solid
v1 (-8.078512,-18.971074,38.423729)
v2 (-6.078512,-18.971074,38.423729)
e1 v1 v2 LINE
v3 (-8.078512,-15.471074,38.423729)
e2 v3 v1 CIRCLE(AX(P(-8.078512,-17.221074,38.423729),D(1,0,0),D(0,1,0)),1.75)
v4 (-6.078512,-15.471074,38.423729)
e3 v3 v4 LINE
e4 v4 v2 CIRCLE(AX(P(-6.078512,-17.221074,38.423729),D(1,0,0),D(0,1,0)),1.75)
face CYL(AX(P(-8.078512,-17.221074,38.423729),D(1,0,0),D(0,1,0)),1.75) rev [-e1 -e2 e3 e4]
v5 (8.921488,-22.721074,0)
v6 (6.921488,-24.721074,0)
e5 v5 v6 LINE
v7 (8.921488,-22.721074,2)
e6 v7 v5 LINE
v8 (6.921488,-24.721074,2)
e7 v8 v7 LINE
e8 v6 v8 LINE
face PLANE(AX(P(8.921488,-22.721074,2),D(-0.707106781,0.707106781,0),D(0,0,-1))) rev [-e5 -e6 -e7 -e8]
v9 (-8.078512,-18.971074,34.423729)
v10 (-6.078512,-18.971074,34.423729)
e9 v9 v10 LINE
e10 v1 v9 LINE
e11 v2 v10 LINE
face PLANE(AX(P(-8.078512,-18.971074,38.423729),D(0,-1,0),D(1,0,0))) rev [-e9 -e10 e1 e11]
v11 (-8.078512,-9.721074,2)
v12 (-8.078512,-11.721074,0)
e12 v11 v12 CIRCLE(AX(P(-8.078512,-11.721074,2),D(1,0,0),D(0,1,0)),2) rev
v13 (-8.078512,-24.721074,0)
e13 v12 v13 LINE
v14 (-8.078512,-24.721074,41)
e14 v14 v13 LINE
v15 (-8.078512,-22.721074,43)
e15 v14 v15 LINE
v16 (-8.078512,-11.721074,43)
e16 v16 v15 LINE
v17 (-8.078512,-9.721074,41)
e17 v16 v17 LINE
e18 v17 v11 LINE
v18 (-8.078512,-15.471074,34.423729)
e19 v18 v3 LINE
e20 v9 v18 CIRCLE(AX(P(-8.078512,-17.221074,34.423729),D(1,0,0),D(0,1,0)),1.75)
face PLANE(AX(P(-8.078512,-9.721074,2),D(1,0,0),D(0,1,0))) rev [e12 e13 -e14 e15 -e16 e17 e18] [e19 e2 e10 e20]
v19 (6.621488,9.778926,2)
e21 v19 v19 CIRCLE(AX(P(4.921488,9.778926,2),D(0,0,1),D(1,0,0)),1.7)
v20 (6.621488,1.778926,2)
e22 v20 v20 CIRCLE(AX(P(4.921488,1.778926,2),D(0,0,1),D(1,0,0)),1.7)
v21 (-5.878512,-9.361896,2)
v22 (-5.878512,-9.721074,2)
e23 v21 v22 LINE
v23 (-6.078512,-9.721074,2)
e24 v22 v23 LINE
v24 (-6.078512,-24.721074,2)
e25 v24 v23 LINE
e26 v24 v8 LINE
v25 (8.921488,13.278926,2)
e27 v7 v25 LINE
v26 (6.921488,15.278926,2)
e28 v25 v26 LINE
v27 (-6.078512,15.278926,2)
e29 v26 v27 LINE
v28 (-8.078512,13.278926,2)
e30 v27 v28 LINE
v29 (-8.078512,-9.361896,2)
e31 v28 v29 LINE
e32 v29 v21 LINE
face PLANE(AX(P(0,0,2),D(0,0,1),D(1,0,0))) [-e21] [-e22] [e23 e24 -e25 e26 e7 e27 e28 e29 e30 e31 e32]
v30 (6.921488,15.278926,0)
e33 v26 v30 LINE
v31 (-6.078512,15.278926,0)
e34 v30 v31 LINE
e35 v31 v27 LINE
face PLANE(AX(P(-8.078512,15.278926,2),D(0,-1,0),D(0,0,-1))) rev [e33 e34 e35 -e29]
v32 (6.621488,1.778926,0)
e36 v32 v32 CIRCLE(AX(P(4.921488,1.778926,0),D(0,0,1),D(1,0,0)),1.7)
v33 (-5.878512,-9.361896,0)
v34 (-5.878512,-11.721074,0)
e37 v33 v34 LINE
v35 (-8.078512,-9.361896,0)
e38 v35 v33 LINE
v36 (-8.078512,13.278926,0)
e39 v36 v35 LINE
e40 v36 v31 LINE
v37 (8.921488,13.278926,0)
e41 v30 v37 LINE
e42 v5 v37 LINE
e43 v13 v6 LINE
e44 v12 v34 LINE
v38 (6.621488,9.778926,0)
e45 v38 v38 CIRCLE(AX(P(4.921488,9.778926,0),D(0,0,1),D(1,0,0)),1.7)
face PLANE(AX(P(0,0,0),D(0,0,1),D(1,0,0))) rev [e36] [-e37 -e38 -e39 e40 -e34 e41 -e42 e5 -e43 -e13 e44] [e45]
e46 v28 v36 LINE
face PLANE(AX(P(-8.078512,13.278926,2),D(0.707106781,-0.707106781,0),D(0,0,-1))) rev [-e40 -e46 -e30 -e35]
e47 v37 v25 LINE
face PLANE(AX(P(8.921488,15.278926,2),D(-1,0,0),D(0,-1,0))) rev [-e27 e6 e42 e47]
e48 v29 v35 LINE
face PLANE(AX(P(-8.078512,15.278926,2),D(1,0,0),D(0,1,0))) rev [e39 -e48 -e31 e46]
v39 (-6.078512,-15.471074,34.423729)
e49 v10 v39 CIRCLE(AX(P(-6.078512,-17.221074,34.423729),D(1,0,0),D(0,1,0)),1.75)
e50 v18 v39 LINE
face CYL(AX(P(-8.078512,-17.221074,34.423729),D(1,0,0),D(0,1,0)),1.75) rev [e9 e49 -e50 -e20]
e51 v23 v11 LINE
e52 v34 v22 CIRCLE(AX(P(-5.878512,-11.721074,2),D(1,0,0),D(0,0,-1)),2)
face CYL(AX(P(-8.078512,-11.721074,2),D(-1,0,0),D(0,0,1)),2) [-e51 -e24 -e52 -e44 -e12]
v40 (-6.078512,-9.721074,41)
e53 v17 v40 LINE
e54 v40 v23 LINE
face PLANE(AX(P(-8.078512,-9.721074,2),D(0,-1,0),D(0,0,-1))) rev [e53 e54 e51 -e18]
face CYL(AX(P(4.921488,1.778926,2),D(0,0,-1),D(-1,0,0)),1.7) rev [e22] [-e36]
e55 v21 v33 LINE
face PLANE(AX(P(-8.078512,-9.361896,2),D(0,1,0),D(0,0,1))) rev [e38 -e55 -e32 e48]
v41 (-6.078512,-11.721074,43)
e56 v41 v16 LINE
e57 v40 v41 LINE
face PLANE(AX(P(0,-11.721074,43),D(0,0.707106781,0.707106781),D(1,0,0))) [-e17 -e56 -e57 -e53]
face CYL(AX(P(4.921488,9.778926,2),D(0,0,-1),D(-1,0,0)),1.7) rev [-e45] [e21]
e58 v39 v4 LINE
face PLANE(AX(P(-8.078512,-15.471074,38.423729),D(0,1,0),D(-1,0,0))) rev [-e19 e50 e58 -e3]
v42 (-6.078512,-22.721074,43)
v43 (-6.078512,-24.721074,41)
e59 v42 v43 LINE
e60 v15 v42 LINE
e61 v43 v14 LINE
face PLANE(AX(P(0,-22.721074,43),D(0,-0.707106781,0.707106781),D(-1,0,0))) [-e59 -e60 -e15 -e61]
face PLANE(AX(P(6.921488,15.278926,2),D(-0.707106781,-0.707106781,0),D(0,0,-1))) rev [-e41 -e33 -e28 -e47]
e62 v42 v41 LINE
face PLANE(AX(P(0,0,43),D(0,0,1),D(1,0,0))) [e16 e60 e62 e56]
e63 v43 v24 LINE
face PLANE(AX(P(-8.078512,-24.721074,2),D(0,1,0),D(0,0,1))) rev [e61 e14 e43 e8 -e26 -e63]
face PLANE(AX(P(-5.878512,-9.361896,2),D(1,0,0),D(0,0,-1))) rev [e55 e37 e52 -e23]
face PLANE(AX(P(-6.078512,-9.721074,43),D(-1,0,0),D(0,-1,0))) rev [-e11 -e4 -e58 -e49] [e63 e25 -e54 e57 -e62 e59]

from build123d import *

# Parameters (mm, degrees)
SKETCH1_R           = 1.7
BOSS_EXTRUDE1_DEPTH = 2
SKETCH2_W           = 2
SKETCH2_H           = 15
BOSS_EXTRUDE2_DEPTH = 41
CUT_EXTRUDE1_DEPTH  = 52.818254684
FILLET1_R           = 2
CHAMFER1_SIZE       = 2


with BuildPart() as part:
    # Sketch1 → Boss-Extrude1 (new body)
    with BuildSketch(Plane.XY):
        Polygon((-8.078512397, -9.72107438), (-8.078512397, -24.72107438), (8.921487603, -24.72107438), (8.921487603, 15.27892562), (-8.078512397, 15.27892562), (-8.078512397, -9.36189554), (-5.878512397, -9.36189554), (-5.878512397, -9.72107438), align=None)
        with Locations((4.921487603, 9.77892562)):
            Circle(SKETCH1_R, mode=Mode.SUBTRACT)
        with Locations((4.921487603, 1.77892562)):
            Circle(SKETCH1_R, mode=Mode.SUBTRACT)
    extrude(amount=BOSS_EXTRUDE1_DEPTH)

    # Sketch2 → Boss-Extrude2 (add)
    with BuildSketch(Plane.XY.offset(2)):
        with Locations((-7.078512397, -17.22107438)):
            Rectangle(SKETCH2_W, SKETCH2_H)
    extrude(amount=BOSS_EXTRUDE2_DEPTH)

    # Sketch3 → Cut-Extrude1 (cut, through all)
    with BuildSketch(Plane(origin=(-6.078512397, 0, 0), x_dir=(0, 0, -1), z_dir=(1, 0, 0))):
        with BuildLine():
            Line((-38.423728751, -15.47107438), (-34.423728751, -15.47107438))
            ThreePointArc((-34.423728751, -15.47107438), (-32.673728751, -17.22107438), (-34.423728751, -18.97107438))
            Line((-34.423728751, -18.97107438), (-38.423728751, -18.97107438))
            ThreePointArc((-38.423728751, -18.97107438), (-40.173728751, -17.22107438), (-38.423728751, -15.47107438))
        make_face()
    extrude(amount=-CUT_EXTRUDE1_DEPTH, mode=Mode.SUBTRACT)

    # Fillet1
    fillet1_edges = [part.edges().sort_by_distance(p)[0] for p in [
        (-6.978512397, -9.72107438, 0),
    ]]
    fillet(fillet1_edges, radius=FILLET1_R - 0.0001)  # a hair under: the kernel refuses the full size

    # Chamfer1
    chamfer1_edges = [part.edges().sort_by_distance(p)[0] for p in [
        (-8.078512397, 15.27892562, 1),
        (8.921487603, 15.27892562, 1),
        (8.921487603, -24.72107438, 1),
        (-7.078512397, -24.72107438, 43),
        (-7.078512397, -9.72107438, 43),
    ]]
    chamfer(chamfer1_edges, length=CHAMFER1_SIZE)


solid = part.part
